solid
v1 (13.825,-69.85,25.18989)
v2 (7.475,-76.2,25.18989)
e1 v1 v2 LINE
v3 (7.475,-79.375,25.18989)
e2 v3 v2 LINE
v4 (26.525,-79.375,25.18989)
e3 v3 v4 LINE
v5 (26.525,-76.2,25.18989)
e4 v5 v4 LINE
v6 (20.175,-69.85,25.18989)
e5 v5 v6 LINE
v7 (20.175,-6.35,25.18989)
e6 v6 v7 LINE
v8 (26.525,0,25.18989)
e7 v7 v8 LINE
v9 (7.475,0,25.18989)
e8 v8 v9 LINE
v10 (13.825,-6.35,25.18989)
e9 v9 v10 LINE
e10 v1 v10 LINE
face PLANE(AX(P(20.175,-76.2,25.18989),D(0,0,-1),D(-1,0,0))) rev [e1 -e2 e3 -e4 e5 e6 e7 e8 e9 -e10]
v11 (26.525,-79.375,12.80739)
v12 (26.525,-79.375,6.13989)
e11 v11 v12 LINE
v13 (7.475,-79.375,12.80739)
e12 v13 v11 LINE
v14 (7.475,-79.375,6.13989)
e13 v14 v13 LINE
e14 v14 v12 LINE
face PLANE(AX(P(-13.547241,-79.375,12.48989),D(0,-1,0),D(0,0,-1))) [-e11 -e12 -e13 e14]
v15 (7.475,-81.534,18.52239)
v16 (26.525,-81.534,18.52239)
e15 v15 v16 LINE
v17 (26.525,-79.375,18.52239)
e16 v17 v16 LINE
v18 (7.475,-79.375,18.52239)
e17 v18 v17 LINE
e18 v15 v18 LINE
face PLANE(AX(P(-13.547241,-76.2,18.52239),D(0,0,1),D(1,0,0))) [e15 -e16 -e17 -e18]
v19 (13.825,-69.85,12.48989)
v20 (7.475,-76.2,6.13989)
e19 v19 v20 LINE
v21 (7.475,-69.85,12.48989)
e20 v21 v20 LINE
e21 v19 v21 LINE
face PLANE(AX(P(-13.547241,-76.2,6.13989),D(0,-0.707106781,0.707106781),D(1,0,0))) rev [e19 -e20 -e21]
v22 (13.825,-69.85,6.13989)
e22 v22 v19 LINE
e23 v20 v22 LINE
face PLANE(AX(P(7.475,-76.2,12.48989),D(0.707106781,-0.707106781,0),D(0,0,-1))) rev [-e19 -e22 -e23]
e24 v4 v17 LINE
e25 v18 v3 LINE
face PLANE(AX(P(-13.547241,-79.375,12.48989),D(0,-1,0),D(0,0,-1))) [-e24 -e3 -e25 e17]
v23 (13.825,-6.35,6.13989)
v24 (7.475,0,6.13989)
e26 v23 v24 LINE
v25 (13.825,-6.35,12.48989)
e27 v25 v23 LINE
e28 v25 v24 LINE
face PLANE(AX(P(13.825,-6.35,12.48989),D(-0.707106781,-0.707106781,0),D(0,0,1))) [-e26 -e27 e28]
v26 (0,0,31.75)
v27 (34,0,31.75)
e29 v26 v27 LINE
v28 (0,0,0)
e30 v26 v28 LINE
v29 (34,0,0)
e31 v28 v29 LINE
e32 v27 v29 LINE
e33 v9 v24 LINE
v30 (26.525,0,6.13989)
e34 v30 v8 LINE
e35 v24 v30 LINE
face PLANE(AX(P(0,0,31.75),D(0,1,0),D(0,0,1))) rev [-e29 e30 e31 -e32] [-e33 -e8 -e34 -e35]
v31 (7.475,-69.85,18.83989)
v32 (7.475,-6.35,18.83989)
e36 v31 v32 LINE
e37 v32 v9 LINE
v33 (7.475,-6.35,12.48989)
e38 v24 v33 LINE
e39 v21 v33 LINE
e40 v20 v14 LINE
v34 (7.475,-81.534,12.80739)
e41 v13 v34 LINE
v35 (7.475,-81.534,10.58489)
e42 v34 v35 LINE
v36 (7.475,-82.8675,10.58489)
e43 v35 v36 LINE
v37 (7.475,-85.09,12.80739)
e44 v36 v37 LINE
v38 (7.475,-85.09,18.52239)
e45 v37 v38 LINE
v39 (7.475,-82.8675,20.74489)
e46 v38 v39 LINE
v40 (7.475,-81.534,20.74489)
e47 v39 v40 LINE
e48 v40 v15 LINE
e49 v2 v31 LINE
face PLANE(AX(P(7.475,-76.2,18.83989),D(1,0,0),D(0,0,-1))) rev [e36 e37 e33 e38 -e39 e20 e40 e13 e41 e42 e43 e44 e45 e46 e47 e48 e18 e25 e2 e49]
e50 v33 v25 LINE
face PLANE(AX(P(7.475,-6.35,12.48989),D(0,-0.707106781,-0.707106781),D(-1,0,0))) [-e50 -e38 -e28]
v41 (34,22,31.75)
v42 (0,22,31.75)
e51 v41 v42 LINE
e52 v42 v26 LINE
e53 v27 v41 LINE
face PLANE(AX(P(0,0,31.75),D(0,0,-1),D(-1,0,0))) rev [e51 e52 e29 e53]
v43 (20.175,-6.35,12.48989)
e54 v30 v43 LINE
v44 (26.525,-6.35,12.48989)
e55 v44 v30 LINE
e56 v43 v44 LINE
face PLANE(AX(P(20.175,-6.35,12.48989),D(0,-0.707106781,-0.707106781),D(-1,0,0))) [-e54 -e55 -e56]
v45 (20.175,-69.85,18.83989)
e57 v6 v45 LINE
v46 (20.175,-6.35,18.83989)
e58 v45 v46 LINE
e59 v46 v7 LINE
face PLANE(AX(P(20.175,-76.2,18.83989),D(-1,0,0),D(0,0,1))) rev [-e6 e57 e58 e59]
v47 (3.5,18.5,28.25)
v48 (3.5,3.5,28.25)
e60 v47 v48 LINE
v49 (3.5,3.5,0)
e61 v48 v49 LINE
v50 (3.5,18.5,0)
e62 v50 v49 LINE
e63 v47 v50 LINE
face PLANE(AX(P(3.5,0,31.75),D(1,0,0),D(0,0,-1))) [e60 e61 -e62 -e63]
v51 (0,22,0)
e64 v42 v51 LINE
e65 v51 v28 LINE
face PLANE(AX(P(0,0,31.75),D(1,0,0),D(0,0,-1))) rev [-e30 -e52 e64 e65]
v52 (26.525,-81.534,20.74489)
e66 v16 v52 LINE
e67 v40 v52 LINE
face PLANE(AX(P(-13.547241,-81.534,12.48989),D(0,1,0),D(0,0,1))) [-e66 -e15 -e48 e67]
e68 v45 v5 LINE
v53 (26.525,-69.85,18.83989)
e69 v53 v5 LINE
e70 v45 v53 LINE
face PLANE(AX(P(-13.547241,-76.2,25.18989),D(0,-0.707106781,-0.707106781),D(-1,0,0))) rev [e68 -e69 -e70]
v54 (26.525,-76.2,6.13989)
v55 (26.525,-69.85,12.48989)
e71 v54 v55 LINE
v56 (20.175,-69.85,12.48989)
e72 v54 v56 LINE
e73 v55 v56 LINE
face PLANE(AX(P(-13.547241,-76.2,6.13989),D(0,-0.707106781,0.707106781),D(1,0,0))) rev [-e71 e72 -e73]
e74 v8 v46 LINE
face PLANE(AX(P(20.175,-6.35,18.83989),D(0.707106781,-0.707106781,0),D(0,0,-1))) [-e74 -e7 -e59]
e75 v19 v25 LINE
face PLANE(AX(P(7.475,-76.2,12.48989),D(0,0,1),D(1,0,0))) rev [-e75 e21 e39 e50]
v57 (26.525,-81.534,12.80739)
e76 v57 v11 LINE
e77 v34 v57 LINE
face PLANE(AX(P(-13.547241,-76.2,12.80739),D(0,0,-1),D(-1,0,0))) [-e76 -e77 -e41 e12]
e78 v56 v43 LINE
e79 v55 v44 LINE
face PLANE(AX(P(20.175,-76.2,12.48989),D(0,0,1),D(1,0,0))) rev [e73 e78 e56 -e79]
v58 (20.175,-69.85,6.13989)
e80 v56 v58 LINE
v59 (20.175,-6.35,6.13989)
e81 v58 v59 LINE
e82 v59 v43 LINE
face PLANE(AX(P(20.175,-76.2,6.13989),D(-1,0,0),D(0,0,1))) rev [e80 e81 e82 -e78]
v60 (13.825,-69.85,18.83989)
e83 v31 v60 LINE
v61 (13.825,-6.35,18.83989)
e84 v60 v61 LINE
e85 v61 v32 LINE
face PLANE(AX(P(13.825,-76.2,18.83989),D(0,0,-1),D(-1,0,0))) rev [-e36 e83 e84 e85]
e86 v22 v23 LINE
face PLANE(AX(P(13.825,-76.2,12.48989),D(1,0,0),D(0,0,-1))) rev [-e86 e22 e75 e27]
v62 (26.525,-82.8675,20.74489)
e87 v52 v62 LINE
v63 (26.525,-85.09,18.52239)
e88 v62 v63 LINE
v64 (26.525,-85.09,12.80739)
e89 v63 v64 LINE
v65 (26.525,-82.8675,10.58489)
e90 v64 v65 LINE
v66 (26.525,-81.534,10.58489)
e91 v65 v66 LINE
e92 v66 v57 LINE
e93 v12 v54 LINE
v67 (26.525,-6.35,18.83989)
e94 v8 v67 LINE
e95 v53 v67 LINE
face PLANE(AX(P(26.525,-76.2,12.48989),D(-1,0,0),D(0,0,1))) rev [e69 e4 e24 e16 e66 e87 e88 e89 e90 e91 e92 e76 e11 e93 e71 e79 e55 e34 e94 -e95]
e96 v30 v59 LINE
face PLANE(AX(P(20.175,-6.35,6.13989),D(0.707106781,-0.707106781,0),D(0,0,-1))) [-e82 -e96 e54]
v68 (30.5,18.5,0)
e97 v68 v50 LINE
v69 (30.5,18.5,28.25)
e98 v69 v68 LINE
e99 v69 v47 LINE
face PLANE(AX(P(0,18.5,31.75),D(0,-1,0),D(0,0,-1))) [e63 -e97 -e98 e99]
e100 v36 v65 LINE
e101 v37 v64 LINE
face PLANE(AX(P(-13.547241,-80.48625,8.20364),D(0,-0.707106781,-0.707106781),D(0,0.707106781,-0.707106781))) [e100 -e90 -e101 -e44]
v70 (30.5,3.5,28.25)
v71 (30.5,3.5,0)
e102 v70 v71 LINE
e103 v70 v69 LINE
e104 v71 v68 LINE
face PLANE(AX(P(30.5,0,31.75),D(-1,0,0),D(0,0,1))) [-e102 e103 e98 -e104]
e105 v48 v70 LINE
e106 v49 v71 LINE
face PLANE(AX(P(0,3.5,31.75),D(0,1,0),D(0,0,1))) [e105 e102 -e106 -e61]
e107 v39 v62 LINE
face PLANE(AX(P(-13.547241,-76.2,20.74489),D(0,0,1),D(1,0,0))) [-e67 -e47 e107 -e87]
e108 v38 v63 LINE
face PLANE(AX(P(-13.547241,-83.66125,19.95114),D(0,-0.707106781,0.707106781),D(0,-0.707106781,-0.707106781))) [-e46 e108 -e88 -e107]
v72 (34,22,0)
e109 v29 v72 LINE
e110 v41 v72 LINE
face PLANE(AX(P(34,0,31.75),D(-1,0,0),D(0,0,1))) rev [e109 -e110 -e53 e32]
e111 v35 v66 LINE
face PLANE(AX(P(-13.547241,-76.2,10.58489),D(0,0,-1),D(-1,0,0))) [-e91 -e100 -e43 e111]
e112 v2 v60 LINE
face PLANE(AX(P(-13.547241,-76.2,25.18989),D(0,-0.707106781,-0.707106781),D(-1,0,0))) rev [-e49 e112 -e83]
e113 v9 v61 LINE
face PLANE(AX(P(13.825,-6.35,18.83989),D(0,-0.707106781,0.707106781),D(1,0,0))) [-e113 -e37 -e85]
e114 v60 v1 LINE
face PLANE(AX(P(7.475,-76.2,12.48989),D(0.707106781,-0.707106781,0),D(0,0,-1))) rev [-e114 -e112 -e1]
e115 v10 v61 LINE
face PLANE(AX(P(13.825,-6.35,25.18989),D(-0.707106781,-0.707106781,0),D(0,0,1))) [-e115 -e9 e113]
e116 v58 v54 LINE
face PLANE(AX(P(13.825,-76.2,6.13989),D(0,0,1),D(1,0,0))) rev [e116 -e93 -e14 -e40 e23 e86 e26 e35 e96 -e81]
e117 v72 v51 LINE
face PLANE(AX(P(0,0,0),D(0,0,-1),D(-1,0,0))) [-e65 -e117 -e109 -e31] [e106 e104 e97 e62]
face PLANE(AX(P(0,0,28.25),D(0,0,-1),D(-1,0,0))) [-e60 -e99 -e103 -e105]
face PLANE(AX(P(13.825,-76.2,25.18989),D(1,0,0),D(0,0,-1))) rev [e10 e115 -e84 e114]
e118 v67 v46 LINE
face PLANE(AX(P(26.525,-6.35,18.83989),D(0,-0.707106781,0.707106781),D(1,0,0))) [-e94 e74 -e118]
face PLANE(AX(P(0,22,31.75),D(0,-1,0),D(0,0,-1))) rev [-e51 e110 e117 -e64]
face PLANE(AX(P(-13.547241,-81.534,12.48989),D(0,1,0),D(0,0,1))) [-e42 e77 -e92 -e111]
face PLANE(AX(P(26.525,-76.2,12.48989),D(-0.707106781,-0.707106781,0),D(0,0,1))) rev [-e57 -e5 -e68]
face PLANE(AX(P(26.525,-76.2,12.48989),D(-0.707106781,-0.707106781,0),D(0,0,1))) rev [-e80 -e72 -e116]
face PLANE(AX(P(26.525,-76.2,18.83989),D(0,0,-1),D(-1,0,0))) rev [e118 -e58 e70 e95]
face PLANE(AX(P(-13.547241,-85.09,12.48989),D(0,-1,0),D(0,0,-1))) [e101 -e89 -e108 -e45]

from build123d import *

# Parameters (mm, degrees)
SKETCH1_W           = 34
SKETCH1_H           = 22
BOSS_EXTRUDE1_DEPTH = 31.75
SHELL1_T            = -3.5
BOSS_EXTRUDE2_DEPTH = 76.2
BOSS_EXTRUDE3_START = 26.525
BOSS_EXTRUDE3_DEPTH = 19.05
CHAMFER1_SIZE       = 6.35


with BuildPart() as part:
    # Sketch1 → Boss-Extrude1 (new body)
    with BuildSketch(Plane.XY):
        with Locations((17, 11)):
            Rectangle(SKETCH1_W, SKETCH1_H)
    extrude(amount=BOSS_EXTRUDE1_DEPTH)

    # Shell1
    shell1_openings = [part.faces().sort_by_distance(p)[0] for p in [
        (17, 11, 0),
    ]]
    offset(amount=SHELL1_T, openings=shell1_openings, kind=Kind.INTERSECTION)

    # Sketch2 → Boss-Extrude2 (add)
    with BuildSketch(Plane.XZ):
        Polygon((13.825, 25.189889706), (13.825, 18.839889706), (7.475, 18.839889706), (7.475, 12.489889706), (13.825, 12.489889706), (13.825, 6.139889706), (20.175, 6.139889706), (20.175, 12.489889706), (26.525, 12.489889706), (26.525, 18.839889706), (20.175, 18.839889706), (20.175, 25.189889706), align=None)
    extrude(amount=BOSS_EXTRUDE2_DEPTH)

    # Sketch3 → Boss-Extrude3 (add)
    with BuildSketch(Plane(origin=(0, 0, 0), x_dir=(0, 0, -1), z_dir=(1, 0, 0)).offset(BOSS_EXTRUDE3_START)):
        Polygon((-10.584889706, -81.534), (-10.584889706, -82.8675), (-12.807389706, -85.09), (-18.522389706, -85.09), (-20.744889706, -82.8675), (-20.744889706, -81.534), (-18.522389706, -81.534), (-18.522389706, -79.375), (-25.189889706, -79.375), (-25.189889706, -76.2), (-6.139889706, -76.2), (-6.139889706, -79.375), (-12.807389706, -79.375), (-12.807389706, -81.534), align=None)
    extrude(amount=-BOSS_EXTRUDE3_DEPTH)

    # Chamfer1
    # the kernel refuses this chamfer: 6.35 mm, written as the material it adds along each edge
    with BuildSketch(Plane(origin=(30.155186974, -76.2, 18.839889706), x_dir=(0, -0.027495876610585664, 0.9996219169112966), z_dir=(-1, 0, 0))) as chamfer1_piece_1_section:
        Polygon((CHAMFER1_SIZE * 0.999621916911, CHAMFER1_SIZE * 0.0274958766106), (-CHAMFER1_SIZE * 0.0274958766106, CHAMFER1_SIZE * 0.999621916911), (0, 0), align=None)
    chamfer1_piece_1 = extrude(amount=22.680186974, mode=Mode.PRIVATE)
    chamfer1_piece_1 = split(chamfer1_piece_1, bisect_by=Plane(origin=(26.525, -74.083333333, 20.956556373), z_dir=(-1, 0, 0)), keep=Keep.TOP, mode=Mode.PRIVATE)
    add(chamfer1_piece_1)
    with BuildSketch(Plane(origin=(13.825, -76.2, 25.189889706), x_dir=(-0.9996219169112966, -0.027495876610585654, 0), z_dir=(0, 0, -1))) as chamfer1_piece_2_section:
        Polygon((CHAMFER1_SIZE * 0.999621916911, CHAMFER1_SIZE * 0.0274958766106), (-CHAMFER1_SIZE * 0.0274958766106, CHAMFER1_SIZE * 0.999621916911), (0, 0), align=None)
    chamfer1_piece_2 = extrude(amount=22.680186974, mode=Mode.PRIVATE)
    chamfer1_piece_2 = split(chamfer1_piece_2, bisect_by=Plane(origin=(11.708333333, -74.083333333, 6.139889706), z_dir=(0, 0, 1)), keep=Keep.TOP, mode=Mode.PRIVATE)
    add(chamfer1_piece_2)
    with BuildSketch(Plane(origin=(26.525, -76.2, 18.839889706), x_dir=(0, -0.027495876610585654, 0.9996219169112968), z_dir=(-1, 0, 0))) as chamfer1_piece_3_section:
        Polygon((CHAMFER1_SIZE * 0.999621916911, CHAMFER1_SIZE * 0.0274958766106), (-CHAMFER1_SIZE * 0.0274958766106, CHAMFER1_SIZE * 0.999621916911), (0, 0), align=None)
    chamfer1_piece_3 = extrude(amount=22.680186974, mode=Mode.PRIVATE)
    chamfer1_piece_3 = split(chamfer1_piece_3, bisect_by=Plane(origin=(7.475, -74.083333333, 20.956556373), z_dir=(1, 0, 0)), keep=Keep.TOP, mode=Mode.PRIVATE)
    add(chamfer1_piece_3)
    with BuildSketch(Plane(origin=(20.175, -76.2, 2.509702732), x_dir=(0.9996219169112966, -0.02749587661058565, 0), z_dir=(0, 0, 1))) as chamfer1_piece_4_section:
        Polygon((CHAMFER1_SIZE * 0.999621916911, CHAMFER1_SIZE * 0.0274958766106), (-CHAMFER1_SIZE * 0.0274958766106, CHAMFER1_SIZE * 0.999621916911), (0, 0), align=None)
    chamfer1_piece_4 = extrude(amount=22.680186974, mode=Mode.PRIVATE)
    chamfer1_piece_4 = split(chamfer1_piece_4, bisect_by=Plane(origin=(22.291666667, -74.083333333, 6.139889706), z_dir=(0, 0, 1)), keep=Keep.TOP, mode=Mode.PRIVATE)
    add(chamfer1_piece_4)
    with BuildSketch(Plane(origin=(3.844813026, -76.2, 12.489889706), x_dir=(0, -0.027495876610585654, -0.9996219169112966), z_dir=(1, 0, 0))) as chamfer1_piece_5_section:
        Polygon((CHAMFER1_SIZE * 0.999621916911, CHAMFER1_SIZE * 0.0274958766106), (-CHAMFER1_SIZE * 0.0274958766106, CHAMFER1_SIZE * 0.999621916911), (0, 0), align=None)
    chamfer1_piece_5 = extrude(amount=22.680186974, mode=Mode.PRIVATE)
    chamfer1_piece_5 = split(chamfer1_piece_5, bisect_by=Plane(origin=(7.475, -74.083333333, 10.373223039), z_dir=(1, 0, 0)), keep=Keep.TOP, mode=Mode.PRIVATE)
    add(chamfer1_piece_5)
    with BuildSketch(Plane(origin=(20.175, -76.2, 6.139889706), x_dir=(0.9996219169112966, -0.02749587661058565, 0), z_dir=(0, 0, 1))) as chamfer1_piece_6_section:
        Polygon((CHAMFER1_SIZE * 0.999621916911, CHAMFER1_SIZE * 0.0274958766106), (-CHAMFER1_SIZE * 0.0274958766106, CHAMFER1_SIZE * 0.999621916911), (0, 0), align=None)
    chamfer1_piece_6 = extrude(amount=22.680186974, mode=Mode.PRIVATE)
    chamfer1_piece_6 = split(chamfer1_piece_6, bisect_by=Plane(origin=(22.291666667, -74.083333333, 25.189889706), z_dir=(0, 0, -1)), keep=Keep.TOP, mode=Mode.PRIVATE)
    add(chamfer1_piece_6)
    with BuildSketch(Plane(origin=(7.475, -76.2, 12.489889706), x_dir=(0, -0.027495876610585654, -0.9996219169112966), z_dir=(1, 0, 0))) as chamfer1_piece_7_section:
        Polygon((CHAMFER1_SIZE * 0.999621916911, CHAMFER1_SIZE * 0.0274958766106), (-CHAMFER1_SIZE * 0.0274958766106, CHAMFER1_SIZE * 0.999621916911), (0, 0), align=None)
    chamfer1_piece_7 = extrude(amount=22.680186974, mode=Mode.PRIVATE)
    chamfer1_piece_7 = split(chamfer1_piece_7, bisect_by=Plane(origin=(26.525, -74.083333333, 10.373223039), z_dir=(-1, 0, 0)), keep=Keep.TOP, mode=Mode.PRIVATE)
    add(chamfer1_piece_7)
    with BuildSketch(Plane(origin=(13.825, -76.2, 28.820076679), x_dir=(-0.9996219169112966, -0.02749587661058566, 0), z_dir=(0, 0, -1))) as chamfer1_piece_8_section:
        Polygon((CHAMFER1_SIZE * 0.999621916911, CHAMFER1_SIZE * 0.0274958766106), (-CHAMFER1_SIZE * 0.0274958766106, CHAMFER1_SIZE * 0.999621916911), (0, 0), align=None)
    chamfer1_piece_8 = extrude(amount=22.680186974, mode=Mode.PRIVATE)
    chamfer1_piece_8 = split(chamfer1_piece_8, bisect_by=Plane(origin=(11.708333333, -74.083333333, 25.189889706), z_dir=(0, 0, -1)), keep=Keep.TOP, mode=Mode.PRIVATE)
    add(chamfer1_piece_8)
    with BuildSketch(Plane(origin=(13.825, 0, 25.189889706), x_dir=(-0.9996219169112966, 0.02749587661058637, 0), z_dir=(0, 0, -1))) as chamfer1_piece_9_section:
        Polygon((CHAMFER1_SIZE * 0.999621916911, -CHAMFER1_SIZE * 0.0274958766106), (-CHAMFER1_SIZE * 0.0274958766106, -CHAMFER1_SIZE * 0.999621916911), (0, 0), align=None)
    chamfer1_piece_9 = extrude(amount=22.680186974, mode=Mode.PRIVATE)
    chamfer1_piece_9 = split(chamfer1_piece_9, bisect_by=Plane(origin=(11.708333333, -2.116666667, 6.139889706), z_dir=(0, 0, 1)), keep=Keep.TOP, mode=Mode.PRIVATE)
    add(chamfer1_piece_9)
    with BuildSketch(Plane(origin=(30.155186974, 0, 18.839889706), x_dir=(0, 0.027495876610586382, 0.9996219169112966), z_dir=(-1, 0, 0))) as chamfer1_piece_10_section:
        Polygon((CHAMFER1_SIZE * 0.999621916911, -CHAMFER1_SIZE * 0.0274958766106), (-CHAMFER1_SIZE * 0.0274958766106, -CHAMFER1_SIZE * 0.999621916911), (0, 0), align=None)
    chamfer1_piece_10 = extrude(amount=22.680186974, mode=Mode.PRIVATE)
    chamfer1_piece_10 = split(chamfer1_piece_10, bisect_by=Plane(origin=(26.525, -2.116666667, 20.956556373), z_dir=(-1, 0, 0)), keep=Keep.TOP, mode=Mode.PRIVATE)
    add(chamfer1_piece_10)
    with BuildSketch(Plane(origin=(26.525, 0, 18.839889706), x_dir=(0, -0.9996219169112966, -0.0274958766105862), z_dir=(-1, 0, 0))) as chamfer1_piece_11_section:
        Polygon((CHAMFER1_SIZE * 0.999621916911, CHAMFER1_SIZE * 0.0274958766106), (-CHAMFER1_SIZE * 0.0274958766106, CHAMFER1_SIZE * 0.999621916911), (0, 0), align=None)
    chamfer1_piece_11 = extrude(amount=22.680186974, mode=Mode.PRIVATE)
    chamfer1_piece_11 = split(chamfer1_piece_11, bisect_by=Plane(origin=(7.475, -2.116666667, 20.956556373), z_dir=(1, 0, 0)), keep=Keep.TOP, mode=Mode.PRIVATE)
    add(chamfer1_piece_11)
    with BuildSketch(Plane(origin=(20.175, 0, 2.509702732), x_dir=(-0.0274958766105862, -0.9996219169112966, 0), z_dir=(0, 0, 1))) as chamfer1_piece_12_section:
        Polygon((CHAMFER1_SIZE * 0.999621916911, CHAMFER1_SIZE * 0.0274958766106), (-CHAMFER1_SIZE * 0.0274958766106, CHAMFER1_SIZE * 0.999621916911), (0, 0), align=None)
    chamfer1_piece_12 = extrude(amount=22.680186974, mode=Mode.PRIVATE)
    chamfer1_piece_12 = split(chamfer1_piece_12, bisect_by=Plane(origin=(22.291666667, -2.116666667, 6.139889706), z_dir=(0, 0, 1)), keep=Keep.TOP, mode=Mode.PRIVATE)
    add(chamfer1_piece_12)
    with BuildSketch(Plane(origin=(20.175, 0, 6.139889706), x_dir=(0.9996219169112966, 0.027495876610586365, 0), z_dir=(0, 0, 1))) as chamfer1_piece_13_section:
        Polygon((CHAMFER1_SIZE * 0.999621916911, -CHAMFER1_SIZE * 0.0274958766106), (-CHAMFER1_SIZE * 0.0274958766106, -CHAMFER1_SIZE * 0.999621916911), (0, 0), align=None)
    chamfer1_piece_13 = extrude(amount=22.680186974, mode=Mode.PRIVATE)
    chamfer1_piece_13 = split(chamfer1_piece_13, bisect_by=Plane(origin=(22.291666667, -2.116666667, 25.189889706), z_dir=(0, 0, -1)), keep=Keep.TOP, mode=Mode.PRIVATE)
    add(chamfer1_piece_13)
    with BuildSketch(Plane(origin=(3.844813026, 0, 12.489889706), x_dir=(0, -0.9996219169112966, 0.02749587661058647), z_dir=(1, 0, 0))) as chamfer1_piece_14_section:
        Polygon((CHAMFER1_SIZE * 0.999621916911, CHAMFER1_SIZE * 0.0274958766106), (-CHAMFER1_SIZE * 0.0274958766106, CHAMFER1_SIZE * 0.999621916911), (0, 0), align=None)
    chamfer1_piece_14 = extrude(amount=22.680186974, mode=Mode.PRIVATE)
    chamfer1_piece_14 = split(chamfer1_piece_14, bisect_by=Plane(origin=(7.475, -2.116666667, 10.373223039), z_dir=(1, 0, 0)), keep=Keep.TOP, mode=Mode.PRIVATE)
    add(chamfer1_piece_14)
    with BuildSketch(Plane(origin=(13.825, 0, 28.820076679), x_dir=(-0.9996219169112966, 0.02749587661058637, 0), z_dir=(0, 0, -1))) as chamfer1_piece_15_section:
        Polygon((CHAMFER1_SIZE * 0.999621916911, -CHAMFER1_SIZE * 0.0274958766106), (-CHAMFER1_SIZE * 0.0274958766106, -CHAMFER1_SIZE * 0.999621916911), (0, 0), align=None)
    chamfer1_piece_15 = extrude(amount=22.680186974, mode=Mode.PRIVATE)
    chamfer1_piece_15 = split(chamfer1_piece_15, bisect_by=Plane(origin=(11.708333333, -2.116666667, 25.189889706), z_dir=(0, 0, -1)), keep=Keep.TOP, mode=Mode.PRIVATE)
    add(chamfer1_piece_15)
    with BuildSketch(Plane(origin=(7.475, 0, 12.489889706), x_dir=(0, 0.02749587661058637, -0.9996219169112966), z_dir=(1, 0, 0))) as chamfer1_piece_16_section:
        Polygon((CHAMFER1_SIZE * 0.999621916911, -CHAMFER1_SIZE * 0.0274958766106), (-CHAMFER1_SIZE * 0.0274958766106, -CHAMFER1_SIZE * 0.999621916911), (0, 0), align=None)
    chamfer1_piece_16 = extrude(amount=22.680186974, mode=Mode.PRIVATE)
    chamfer1_piece_16 = split(chamfer1_piece_16, bisect_by=Plane(origin=(26.525, -2.116666667, 10.373223039), z_dir=(-1, 0, 0)), keep=Keep.TOP, mode=Mode.PRIVATE)
    add(chamfer1_piece_16)


solid = part.part
